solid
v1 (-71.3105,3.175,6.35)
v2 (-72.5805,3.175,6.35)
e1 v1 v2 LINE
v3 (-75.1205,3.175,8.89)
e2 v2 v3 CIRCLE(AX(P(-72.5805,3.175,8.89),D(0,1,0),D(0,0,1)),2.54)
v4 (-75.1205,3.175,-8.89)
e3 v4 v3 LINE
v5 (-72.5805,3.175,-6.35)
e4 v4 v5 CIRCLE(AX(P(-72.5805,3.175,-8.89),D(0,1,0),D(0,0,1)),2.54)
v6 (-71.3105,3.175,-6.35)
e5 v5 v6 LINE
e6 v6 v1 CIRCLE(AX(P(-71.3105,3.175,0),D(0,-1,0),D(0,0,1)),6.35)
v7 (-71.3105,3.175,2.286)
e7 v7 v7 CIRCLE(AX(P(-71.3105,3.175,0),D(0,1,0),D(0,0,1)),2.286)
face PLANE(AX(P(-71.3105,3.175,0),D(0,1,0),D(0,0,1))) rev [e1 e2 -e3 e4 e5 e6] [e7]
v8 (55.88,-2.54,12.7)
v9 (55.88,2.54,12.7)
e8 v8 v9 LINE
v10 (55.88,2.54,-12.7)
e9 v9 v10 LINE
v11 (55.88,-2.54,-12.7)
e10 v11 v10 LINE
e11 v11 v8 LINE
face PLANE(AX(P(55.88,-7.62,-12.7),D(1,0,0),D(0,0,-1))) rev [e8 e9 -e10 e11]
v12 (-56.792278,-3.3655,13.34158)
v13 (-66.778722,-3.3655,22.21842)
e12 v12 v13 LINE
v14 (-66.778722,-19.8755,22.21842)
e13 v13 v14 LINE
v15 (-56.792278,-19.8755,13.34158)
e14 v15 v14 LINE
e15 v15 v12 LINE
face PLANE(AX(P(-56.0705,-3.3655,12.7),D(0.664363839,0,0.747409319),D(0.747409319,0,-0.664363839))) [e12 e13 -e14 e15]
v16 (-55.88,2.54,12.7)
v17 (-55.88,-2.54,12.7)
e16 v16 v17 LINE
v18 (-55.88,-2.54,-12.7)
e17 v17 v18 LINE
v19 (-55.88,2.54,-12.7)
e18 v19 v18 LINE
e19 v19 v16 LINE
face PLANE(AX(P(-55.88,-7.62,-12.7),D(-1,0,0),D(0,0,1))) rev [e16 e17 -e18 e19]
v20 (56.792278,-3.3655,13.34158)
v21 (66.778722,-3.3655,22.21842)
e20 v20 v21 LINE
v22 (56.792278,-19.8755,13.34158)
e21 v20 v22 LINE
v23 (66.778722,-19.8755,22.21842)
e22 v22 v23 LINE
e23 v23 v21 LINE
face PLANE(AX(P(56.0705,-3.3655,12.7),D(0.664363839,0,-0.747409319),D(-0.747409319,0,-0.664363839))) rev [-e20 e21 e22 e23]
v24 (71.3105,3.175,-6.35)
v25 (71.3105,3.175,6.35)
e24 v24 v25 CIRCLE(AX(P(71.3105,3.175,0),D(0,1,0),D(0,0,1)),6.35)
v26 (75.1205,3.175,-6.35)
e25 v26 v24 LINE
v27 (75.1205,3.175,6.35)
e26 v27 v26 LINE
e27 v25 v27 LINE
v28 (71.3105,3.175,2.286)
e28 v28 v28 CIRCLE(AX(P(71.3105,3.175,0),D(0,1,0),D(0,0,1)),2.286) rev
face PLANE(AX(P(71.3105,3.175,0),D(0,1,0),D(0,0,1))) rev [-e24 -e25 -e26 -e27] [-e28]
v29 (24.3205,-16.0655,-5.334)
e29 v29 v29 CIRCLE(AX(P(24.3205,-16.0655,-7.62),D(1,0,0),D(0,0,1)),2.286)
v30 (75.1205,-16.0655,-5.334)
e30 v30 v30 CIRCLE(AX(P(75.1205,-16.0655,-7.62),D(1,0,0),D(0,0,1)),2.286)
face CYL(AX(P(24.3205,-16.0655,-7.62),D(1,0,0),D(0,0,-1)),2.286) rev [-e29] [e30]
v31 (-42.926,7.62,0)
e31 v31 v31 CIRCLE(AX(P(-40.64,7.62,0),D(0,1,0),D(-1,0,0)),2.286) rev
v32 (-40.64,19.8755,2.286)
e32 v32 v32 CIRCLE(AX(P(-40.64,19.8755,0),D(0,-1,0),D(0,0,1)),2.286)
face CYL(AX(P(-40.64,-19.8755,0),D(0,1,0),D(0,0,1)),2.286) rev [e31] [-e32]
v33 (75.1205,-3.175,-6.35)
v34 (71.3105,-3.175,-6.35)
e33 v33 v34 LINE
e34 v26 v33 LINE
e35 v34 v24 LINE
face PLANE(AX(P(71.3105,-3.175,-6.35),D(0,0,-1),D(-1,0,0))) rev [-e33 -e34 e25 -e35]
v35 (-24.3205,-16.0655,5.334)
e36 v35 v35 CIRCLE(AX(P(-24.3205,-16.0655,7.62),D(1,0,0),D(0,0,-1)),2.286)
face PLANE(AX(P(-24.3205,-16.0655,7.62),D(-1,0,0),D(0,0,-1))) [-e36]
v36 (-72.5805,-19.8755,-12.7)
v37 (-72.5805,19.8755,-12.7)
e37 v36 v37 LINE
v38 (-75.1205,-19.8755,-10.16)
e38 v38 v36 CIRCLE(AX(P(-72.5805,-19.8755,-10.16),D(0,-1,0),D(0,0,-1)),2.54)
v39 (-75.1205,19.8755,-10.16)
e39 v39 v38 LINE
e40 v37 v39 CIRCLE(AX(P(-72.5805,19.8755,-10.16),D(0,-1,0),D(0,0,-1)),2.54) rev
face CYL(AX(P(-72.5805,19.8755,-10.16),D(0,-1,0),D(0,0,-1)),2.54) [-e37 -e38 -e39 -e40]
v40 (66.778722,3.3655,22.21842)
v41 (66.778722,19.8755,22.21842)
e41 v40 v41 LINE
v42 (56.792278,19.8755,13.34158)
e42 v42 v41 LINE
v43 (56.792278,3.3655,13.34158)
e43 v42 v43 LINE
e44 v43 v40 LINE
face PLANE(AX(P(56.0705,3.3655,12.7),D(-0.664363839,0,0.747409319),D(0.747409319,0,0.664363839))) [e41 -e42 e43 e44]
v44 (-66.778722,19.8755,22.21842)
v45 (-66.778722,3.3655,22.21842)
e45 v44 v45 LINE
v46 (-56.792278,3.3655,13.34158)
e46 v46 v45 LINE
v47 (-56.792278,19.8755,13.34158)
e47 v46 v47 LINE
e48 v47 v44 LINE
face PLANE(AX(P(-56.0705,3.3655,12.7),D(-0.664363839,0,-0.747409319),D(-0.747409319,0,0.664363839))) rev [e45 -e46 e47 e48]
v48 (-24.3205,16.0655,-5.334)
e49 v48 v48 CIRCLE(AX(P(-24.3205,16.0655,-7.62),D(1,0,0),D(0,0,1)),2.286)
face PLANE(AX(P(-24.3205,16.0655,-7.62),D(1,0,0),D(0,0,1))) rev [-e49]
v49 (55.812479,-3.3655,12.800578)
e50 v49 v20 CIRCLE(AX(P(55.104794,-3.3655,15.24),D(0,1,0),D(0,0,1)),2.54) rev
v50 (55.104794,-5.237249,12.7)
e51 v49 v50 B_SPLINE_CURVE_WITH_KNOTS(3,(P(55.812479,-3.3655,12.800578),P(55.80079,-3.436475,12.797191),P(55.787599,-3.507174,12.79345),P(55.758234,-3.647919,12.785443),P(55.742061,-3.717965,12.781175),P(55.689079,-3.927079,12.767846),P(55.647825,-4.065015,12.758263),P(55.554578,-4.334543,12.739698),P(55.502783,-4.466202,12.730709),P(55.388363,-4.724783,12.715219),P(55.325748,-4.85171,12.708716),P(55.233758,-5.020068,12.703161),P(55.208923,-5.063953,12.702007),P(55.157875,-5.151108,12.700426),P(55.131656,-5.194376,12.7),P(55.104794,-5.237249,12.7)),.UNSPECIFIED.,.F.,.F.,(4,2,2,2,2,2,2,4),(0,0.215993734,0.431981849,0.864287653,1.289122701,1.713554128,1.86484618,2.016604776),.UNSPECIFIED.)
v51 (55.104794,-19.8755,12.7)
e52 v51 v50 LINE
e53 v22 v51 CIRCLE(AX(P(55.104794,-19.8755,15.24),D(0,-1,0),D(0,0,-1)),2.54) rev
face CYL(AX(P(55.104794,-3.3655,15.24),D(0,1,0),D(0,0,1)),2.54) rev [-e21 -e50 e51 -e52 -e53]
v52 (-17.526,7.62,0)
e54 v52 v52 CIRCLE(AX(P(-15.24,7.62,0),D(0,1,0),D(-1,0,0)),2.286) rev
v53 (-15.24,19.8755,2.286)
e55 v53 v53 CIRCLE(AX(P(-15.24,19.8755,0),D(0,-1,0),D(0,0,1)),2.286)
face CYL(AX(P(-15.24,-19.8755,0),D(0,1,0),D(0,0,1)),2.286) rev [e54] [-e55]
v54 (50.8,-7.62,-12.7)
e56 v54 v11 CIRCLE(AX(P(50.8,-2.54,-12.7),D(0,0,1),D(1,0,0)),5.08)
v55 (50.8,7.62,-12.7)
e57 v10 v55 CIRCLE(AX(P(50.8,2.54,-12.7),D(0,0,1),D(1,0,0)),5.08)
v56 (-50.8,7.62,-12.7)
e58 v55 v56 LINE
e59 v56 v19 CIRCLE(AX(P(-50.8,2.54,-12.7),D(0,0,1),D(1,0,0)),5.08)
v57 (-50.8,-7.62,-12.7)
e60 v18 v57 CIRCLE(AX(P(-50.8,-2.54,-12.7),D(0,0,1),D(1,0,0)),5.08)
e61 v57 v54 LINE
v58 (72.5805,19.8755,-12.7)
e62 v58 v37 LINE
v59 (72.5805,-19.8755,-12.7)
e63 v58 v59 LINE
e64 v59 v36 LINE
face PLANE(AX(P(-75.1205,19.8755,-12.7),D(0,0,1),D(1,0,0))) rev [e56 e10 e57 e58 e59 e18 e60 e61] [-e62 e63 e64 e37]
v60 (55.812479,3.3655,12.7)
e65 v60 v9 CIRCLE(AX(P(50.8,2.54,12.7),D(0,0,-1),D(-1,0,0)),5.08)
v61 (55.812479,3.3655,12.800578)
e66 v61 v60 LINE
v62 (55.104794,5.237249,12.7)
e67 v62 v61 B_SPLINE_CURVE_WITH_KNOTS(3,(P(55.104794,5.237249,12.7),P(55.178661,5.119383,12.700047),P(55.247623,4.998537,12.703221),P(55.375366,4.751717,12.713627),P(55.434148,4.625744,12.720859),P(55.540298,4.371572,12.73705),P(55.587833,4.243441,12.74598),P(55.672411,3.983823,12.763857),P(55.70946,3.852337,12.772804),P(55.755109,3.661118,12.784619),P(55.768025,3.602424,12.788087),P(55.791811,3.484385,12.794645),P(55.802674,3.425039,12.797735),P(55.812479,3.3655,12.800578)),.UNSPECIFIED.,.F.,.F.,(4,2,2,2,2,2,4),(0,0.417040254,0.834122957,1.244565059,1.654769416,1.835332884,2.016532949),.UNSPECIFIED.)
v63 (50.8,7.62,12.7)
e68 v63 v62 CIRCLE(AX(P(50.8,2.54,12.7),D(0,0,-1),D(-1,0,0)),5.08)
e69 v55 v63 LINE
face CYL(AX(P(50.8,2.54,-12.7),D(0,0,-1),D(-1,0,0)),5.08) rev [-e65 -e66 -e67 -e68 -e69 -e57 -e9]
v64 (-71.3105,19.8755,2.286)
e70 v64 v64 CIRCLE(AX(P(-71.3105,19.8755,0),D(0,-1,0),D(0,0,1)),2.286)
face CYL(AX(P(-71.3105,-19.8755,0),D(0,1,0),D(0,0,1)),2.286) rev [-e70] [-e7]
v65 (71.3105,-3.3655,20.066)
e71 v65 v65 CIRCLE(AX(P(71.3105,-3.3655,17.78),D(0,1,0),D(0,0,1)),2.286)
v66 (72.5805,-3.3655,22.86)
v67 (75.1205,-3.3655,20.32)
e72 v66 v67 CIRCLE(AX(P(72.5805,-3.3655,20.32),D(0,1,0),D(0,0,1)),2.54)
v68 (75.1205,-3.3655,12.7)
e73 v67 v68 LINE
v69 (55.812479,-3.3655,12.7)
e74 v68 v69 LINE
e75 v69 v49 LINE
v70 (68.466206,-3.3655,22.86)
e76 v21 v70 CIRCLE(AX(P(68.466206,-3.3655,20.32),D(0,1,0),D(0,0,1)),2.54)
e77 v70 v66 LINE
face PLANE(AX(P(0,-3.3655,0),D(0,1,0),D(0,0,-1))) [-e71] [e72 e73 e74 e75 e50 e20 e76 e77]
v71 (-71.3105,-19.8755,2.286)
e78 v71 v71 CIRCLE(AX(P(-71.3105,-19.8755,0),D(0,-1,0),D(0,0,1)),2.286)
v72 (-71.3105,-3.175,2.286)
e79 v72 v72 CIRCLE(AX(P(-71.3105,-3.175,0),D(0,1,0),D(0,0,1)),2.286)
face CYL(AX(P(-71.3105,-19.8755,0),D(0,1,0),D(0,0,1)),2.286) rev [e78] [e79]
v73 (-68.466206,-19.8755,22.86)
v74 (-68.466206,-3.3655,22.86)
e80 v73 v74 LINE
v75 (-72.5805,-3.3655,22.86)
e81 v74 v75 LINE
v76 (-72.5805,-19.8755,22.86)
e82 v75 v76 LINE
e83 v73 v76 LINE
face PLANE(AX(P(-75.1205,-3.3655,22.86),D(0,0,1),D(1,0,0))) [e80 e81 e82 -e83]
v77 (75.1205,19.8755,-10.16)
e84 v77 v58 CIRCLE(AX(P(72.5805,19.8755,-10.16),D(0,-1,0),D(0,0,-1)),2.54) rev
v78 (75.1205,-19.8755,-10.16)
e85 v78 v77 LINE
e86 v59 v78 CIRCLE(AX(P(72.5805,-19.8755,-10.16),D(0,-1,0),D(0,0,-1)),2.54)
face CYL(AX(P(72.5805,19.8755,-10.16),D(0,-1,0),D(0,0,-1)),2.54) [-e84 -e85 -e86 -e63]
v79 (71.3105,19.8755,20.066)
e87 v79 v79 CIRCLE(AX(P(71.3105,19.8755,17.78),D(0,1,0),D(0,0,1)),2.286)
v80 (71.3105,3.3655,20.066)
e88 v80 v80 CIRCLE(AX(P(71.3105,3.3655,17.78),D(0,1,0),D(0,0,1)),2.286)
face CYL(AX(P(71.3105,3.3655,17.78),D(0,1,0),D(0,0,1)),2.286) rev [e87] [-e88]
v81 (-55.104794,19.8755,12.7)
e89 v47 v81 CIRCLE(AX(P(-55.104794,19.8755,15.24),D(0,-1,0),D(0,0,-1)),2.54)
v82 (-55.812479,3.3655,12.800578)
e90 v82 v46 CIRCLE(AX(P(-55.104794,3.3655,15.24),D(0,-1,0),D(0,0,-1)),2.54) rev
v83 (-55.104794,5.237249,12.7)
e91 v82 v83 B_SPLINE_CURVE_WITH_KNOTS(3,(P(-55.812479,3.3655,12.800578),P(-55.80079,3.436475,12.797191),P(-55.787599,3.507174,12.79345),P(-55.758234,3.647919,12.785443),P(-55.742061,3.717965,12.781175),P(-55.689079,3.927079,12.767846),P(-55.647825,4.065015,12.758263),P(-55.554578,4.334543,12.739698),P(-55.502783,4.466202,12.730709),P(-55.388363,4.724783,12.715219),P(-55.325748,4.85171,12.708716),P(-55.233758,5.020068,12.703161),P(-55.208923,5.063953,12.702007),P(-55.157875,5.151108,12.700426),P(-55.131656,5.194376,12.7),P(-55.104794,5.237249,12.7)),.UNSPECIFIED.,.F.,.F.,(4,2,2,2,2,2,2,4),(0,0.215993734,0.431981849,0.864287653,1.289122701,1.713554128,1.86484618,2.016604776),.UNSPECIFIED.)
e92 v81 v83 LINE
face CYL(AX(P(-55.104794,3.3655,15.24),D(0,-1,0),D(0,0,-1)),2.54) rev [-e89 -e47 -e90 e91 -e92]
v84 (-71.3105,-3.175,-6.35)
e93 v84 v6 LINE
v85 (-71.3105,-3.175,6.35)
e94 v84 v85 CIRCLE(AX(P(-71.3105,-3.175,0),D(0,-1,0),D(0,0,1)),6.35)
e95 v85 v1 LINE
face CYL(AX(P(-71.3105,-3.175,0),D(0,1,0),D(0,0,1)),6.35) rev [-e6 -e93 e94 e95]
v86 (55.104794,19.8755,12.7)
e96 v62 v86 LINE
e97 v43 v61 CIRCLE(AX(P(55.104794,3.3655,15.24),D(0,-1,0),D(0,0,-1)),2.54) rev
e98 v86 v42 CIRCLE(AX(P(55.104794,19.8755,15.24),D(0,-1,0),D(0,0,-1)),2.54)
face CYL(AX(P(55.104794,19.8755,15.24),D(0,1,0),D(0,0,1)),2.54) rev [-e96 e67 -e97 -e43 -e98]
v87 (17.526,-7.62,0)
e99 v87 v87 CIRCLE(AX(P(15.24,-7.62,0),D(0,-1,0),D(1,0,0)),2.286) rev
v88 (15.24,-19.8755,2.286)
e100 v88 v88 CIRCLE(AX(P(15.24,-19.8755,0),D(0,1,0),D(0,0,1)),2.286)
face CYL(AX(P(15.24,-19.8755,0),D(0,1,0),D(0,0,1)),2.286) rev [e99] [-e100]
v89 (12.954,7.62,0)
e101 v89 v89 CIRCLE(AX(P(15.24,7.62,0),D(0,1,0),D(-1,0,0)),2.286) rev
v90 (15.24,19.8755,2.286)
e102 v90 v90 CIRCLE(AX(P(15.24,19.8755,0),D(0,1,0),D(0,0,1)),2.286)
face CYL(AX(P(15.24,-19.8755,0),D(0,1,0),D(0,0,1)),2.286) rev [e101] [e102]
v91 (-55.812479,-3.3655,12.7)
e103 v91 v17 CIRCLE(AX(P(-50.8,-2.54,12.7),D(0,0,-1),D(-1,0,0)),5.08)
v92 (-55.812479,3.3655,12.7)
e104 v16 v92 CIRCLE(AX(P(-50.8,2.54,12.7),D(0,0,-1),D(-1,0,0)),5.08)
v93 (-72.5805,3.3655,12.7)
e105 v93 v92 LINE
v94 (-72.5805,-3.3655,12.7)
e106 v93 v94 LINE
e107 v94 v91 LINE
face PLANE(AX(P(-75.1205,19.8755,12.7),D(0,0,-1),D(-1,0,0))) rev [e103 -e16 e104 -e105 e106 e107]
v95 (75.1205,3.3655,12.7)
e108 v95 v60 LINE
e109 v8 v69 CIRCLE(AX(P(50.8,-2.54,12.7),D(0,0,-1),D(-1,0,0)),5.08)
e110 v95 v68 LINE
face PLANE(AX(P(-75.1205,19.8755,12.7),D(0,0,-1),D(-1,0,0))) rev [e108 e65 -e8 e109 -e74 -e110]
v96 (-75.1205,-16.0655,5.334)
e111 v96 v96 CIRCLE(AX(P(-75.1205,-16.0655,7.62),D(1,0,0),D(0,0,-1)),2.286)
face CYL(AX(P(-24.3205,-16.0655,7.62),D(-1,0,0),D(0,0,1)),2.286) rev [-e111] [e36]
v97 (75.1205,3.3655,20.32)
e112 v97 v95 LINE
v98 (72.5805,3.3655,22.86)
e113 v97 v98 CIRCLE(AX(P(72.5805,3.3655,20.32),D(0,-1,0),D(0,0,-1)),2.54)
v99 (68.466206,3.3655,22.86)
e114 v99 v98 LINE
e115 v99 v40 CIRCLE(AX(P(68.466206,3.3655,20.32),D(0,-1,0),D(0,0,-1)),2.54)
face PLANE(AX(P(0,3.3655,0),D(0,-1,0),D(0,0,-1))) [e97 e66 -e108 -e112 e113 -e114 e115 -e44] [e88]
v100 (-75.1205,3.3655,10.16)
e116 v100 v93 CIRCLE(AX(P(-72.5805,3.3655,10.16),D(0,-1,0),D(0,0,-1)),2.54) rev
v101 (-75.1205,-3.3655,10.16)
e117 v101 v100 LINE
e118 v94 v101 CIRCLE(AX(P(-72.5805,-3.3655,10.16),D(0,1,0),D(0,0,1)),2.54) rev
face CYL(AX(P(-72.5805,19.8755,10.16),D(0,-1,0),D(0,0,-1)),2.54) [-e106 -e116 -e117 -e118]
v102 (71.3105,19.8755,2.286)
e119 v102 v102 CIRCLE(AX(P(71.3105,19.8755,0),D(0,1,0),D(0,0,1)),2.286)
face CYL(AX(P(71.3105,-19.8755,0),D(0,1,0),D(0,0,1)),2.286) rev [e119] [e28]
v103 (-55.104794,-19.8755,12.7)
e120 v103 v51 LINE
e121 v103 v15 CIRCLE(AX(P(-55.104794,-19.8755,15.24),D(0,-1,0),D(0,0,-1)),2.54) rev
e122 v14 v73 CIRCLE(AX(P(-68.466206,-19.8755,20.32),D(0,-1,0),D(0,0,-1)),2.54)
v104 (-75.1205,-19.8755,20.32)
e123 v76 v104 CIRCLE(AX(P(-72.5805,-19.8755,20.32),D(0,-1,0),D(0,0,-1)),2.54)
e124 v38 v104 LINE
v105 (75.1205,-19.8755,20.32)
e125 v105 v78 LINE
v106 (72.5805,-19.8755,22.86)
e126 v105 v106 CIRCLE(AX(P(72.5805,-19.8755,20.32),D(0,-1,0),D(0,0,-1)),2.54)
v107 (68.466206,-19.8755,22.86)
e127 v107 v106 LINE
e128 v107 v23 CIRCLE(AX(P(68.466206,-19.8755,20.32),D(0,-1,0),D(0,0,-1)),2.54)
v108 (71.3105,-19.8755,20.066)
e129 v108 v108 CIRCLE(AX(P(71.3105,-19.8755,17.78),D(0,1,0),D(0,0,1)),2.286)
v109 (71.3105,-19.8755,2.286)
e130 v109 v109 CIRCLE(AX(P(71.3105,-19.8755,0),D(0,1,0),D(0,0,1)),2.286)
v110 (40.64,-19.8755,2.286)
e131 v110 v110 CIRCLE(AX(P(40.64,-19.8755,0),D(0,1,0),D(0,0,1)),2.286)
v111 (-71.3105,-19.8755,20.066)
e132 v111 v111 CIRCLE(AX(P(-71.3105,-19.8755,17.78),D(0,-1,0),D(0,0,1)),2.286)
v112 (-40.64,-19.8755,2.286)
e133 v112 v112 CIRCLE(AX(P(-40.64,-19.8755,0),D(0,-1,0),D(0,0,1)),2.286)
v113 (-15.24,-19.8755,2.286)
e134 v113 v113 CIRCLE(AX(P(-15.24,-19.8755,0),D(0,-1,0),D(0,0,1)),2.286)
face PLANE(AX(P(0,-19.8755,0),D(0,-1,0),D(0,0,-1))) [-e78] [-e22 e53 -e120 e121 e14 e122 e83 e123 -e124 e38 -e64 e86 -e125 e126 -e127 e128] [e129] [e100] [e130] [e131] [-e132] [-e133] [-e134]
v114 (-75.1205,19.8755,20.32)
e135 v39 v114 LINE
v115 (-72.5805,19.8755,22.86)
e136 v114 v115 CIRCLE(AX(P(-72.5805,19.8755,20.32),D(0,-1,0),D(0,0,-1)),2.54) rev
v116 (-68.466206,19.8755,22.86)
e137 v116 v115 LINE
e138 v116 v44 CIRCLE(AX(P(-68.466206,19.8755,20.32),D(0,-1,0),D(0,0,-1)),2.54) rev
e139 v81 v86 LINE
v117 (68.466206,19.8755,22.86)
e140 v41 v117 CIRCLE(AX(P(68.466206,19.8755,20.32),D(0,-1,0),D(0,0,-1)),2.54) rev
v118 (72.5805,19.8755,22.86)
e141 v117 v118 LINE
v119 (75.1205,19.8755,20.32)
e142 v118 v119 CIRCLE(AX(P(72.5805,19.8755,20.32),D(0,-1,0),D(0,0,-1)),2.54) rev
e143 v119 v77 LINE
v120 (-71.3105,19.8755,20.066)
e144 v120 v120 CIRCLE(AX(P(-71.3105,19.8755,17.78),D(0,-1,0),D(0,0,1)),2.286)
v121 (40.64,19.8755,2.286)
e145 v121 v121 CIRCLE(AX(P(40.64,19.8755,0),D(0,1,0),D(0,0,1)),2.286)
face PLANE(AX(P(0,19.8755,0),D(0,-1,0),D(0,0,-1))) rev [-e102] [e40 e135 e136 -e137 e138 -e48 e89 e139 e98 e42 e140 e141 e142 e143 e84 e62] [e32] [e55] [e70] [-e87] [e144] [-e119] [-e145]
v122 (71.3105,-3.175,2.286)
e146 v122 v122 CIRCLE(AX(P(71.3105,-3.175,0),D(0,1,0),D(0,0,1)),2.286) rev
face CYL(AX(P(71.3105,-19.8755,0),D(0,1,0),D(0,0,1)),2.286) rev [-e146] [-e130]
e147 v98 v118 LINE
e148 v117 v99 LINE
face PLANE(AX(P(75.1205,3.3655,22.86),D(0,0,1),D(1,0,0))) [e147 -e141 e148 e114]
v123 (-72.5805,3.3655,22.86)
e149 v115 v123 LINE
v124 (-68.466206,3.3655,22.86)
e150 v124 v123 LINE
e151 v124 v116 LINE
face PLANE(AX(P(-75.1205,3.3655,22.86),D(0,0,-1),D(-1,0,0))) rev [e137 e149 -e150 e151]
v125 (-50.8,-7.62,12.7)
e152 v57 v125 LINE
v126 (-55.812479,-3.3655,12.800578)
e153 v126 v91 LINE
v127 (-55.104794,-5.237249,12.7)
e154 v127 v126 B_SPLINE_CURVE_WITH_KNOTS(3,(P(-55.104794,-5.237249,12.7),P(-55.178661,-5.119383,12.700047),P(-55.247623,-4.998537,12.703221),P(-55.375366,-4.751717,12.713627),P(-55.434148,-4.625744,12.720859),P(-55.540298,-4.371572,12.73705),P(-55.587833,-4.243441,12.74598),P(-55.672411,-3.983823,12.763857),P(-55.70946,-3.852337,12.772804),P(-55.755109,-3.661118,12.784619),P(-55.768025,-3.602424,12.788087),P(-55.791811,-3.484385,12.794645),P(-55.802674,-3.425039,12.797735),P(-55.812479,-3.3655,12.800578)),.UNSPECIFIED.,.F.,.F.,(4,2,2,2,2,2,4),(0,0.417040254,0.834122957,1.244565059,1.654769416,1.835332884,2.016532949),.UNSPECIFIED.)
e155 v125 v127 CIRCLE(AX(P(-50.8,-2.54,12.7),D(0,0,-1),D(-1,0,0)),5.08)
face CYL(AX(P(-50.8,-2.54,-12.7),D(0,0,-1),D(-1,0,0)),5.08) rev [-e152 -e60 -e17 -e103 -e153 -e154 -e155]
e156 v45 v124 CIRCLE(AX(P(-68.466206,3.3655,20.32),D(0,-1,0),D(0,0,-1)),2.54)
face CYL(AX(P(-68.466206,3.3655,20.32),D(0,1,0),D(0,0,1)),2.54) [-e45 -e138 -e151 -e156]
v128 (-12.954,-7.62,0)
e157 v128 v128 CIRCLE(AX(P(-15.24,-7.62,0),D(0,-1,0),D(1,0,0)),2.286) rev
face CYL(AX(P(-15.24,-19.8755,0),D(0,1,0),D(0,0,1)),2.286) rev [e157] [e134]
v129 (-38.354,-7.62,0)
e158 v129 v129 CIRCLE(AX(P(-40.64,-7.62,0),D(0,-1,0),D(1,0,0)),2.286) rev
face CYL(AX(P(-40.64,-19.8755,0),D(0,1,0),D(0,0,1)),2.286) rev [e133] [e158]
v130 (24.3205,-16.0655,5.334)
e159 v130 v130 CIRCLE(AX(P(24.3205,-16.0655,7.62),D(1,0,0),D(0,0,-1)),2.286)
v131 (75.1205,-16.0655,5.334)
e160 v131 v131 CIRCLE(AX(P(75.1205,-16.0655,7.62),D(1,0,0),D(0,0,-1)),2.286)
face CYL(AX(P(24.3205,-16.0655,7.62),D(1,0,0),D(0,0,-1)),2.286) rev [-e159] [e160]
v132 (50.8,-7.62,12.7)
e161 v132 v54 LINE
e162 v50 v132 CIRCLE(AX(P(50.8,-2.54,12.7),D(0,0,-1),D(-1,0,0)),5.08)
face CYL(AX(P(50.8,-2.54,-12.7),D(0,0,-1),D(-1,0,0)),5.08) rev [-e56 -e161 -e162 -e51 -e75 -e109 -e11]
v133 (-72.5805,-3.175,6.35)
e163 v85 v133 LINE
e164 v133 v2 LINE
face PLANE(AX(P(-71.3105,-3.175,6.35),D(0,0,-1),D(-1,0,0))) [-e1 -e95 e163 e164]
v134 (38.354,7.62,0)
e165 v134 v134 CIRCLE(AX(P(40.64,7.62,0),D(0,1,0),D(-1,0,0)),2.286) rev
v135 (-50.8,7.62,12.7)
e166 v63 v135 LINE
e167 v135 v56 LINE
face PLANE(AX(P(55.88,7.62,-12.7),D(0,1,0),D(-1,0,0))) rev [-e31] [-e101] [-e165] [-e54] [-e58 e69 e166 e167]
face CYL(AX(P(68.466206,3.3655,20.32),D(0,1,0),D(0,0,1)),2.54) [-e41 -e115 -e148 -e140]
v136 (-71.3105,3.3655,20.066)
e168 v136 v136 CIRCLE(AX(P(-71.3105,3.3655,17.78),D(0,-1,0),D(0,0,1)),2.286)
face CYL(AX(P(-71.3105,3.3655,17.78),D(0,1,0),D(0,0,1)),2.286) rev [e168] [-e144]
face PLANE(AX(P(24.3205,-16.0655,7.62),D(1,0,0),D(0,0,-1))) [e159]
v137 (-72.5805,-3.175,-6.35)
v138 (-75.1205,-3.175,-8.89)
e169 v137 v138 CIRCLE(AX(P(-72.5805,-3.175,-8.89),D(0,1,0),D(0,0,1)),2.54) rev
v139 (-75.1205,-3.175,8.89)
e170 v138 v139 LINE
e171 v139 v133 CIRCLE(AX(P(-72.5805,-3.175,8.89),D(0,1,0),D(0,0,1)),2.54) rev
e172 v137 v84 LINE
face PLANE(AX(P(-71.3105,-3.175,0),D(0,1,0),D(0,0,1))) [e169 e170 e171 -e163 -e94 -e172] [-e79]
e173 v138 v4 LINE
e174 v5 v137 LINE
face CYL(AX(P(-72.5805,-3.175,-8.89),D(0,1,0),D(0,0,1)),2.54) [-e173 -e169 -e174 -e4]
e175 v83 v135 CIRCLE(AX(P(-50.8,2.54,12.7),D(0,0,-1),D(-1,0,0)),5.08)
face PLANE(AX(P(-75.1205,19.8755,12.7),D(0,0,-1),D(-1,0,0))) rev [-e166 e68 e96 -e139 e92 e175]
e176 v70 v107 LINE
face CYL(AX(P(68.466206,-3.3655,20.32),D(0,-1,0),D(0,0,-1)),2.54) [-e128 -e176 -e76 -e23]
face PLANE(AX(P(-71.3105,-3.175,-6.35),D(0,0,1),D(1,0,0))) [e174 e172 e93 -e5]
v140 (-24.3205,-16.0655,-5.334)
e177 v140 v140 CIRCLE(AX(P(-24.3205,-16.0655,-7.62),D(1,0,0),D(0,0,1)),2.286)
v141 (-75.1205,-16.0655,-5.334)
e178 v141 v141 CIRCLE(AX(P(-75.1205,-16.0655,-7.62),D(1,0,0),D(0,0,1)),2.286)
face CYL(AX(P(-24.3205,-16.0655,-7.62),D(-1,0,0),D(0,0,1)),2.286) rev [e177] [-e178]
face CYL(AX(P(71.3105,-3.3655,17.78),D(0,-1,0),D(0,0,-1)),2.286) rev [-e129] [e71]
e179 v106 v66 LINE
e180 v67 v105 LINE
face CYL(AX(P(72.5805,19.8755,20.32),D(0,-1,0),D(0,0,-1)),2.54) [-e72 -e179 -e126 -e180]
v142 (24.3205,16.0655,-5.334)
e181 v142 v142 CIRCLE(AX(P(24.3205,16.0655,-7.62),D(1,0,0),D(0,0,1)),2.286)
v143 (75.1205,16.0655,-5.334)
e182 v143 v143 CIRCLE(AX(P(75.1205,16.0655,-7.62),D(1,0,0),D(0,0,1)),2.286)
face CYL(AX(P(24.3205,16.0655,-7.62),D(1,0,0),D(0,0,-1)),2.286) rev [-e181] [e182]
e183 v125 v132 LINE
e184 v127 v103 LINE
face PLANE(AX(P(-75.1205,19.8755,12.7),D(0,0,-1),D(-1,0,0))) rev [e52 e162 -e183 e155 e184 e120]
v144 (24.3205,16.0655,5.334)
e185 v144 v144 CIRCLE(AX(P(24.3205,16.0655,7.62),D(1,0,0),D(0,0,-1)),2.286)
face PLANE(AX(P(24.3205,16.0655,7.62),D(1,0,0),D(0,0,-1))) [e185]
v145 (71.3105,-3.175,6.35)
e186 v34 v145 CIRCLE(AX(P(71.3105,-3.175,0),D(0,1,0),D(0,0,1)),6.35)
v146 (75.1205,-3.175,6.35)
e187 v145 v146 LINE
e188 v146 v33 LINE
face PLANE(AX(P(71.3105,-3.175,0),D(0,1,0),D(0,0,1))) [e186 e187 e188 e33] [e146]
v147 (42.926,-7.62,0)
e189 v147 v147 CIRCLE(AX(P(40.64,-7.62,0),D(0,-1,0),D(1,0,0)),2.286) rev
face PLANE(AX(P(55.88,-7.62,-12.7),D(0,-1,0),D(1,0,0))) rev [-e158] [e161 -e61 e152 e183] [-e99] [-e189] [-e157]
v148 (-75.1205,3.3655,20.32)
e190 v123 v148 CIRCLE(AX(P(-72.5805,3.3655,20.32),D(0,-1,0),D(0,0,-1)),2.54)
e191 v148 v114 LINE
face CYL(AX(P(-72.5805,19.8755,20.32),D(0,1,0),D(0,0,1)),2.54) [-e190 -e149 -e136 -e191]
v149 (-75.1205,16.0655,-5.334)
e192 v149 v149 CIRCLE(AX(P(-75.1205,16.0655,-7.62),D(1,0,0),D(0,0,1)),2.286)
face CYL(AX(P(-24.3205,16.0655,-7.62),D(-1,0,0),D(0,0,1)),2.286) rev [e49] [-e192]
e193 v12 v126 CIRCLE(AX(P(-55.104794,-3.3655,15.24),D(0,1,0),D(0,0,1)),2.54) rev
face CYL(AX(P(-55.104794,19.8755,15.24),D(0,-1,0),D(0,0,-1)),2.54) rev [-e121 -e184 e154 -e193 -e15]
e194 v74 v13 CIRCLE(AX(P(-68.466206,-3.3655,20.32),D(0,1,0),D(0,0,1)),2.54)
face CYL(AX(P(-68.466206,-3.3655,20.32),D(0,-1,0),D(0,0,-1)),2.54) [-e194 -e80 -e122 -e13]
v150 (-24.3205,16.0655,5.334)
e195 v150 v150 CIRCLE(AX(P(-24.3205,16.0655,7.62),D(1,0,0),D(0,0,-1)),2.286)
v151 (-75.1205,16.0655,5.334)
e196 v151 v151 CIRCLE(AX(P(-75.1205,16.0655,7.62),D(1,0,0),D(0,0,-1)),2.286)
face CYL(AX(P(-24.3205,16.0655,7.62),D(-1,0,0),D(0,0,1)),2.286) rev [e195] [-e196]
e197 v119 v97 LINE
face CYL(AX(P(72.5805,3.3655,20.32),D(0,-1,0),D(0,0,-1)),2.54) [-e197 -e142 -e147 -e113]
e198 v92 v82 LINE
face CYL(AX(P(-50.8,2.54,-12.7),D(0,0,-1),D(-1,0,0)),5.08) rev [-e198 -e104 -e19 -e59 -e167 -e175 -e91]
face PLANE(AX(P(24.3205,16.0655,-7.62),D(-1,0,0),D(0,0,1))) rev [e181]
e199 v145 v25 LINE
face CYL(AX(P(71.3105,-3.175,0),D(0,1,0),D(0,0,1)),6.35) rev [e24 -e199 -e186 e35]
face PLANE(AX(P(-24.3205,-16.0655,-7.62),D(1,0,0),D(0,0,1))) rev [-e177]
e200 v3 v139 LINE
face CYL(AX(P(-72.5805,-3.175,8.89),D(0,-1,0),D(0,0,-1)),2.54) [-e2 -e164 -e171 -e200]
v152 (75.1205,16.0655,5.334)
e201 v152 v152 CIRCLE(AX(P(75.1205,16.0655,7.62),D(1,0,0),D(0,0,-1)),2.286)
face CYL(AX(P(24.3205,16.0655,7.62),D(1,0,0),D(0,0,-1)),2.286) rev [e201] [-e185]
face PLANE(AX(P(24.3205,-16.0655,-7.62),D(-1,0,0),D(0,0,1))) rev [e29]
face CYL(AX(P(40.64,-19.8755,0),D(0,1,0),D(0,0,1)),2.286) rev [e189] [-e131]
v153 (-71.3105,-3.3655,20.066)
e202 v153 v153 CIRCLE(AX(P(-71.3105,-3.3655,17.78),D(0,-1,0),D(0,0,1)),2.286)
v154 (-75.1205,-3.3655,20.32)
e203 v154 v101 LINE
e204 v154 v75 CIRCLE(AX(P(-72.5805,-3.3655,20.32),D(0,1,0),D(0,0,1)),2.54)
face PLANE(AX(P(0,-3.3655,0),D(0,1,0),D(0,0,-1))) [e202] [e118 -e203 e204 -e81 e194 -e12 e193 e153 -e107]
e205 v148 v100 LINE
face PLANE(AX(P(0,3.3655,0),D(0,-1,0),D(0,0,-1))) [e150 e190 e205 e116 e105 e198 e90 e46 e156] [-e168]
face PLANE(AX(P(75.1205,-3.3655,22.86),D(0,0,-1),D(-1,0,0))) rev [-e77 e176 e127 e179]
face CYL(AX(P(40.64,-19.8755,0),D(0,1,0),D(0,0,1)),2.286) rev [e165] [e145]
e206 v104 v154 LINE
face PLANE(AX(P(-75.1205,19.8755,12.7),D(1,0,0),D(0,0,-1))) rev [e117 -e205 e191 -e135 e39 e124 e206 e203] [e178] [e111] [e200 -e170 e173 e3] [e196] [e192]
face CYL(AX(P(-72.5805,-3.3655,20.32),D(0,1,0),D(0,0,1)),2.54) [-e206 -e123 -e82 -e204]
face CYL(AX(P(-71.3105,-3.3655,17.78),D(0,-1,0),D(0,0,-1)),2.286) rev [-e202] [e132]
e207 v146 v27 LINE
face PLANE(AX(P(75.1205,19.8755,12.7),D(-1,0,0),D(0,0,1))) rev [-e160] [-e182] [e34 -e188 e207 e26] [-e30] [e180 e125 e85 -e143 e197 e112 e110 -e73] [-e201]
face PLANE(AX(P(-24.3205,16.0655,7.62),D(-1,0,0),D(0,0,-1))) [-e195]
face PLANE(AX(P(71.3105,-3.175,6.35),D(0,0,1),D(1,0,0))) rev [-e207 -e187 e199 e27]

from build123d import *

# Parameters (mm, degrees)
SKETCH2_W               = 150.241
SKETCH2_H               = 25.4
BOSS_EXTRUDE1_DEPTH     = 19.8755
SKETCH3_R               = 2.286
CUT_EXTRUDE1_DEPTH      = 50.8
SKETCH4_R               = 2.286
BOSS_EXTRUDE2_DEPTH     = 16.51
SKETCH5_R               = 2.286
CUT_EXTRUDE2_DEPTH      = 89.01028986
CUT_EXTRUDE3_DEPTH      = 3.175
SKETCH9_R               = 2.286
CUT_EXTRUDE5_DEPTH      = 89.01028986
SKETCH7_W               = 111.76
SKETCH7_H               = 15.24
CUT_EXTRUDE4_DEPTH      = 82.75136097
MIRROR1_COPY_1_SKETCH_R = 2.286
MIRROR1_COPY_1_DEPTH    = 16.51
FILLET1_R               = 2.54
FILLET2_R               = 5.08


with BuildPart() as part:
    # Sketch2 → Boss-Extrude1 (new, symmetric)
    with BuildSketch(Plane(origin=(0, 0, 0), x_dir=(1, 0, 0), z_dir=(0, 1, 0))):
        Rectangle(SKETCH2_W, SKETCH2_H)
    extrude(amount=BOSS_EXTRUDE1_DEPTH, both=True)

    # Sketch3 → Cut-Extrude1 (cut)
    with BuildSketch(Plane(origin=(75.1205, 0, 0), x_dir=(0, 0, -1), z_dir=(1, 0, 0))):
        with Locations((-7.62, 16.0655)):
            Circle(SKETCH3_R)
        with Locations((-7.62, -16.0655)):
            Circle(SKETCH3_R)
        with Locations(Location((7.62, 16.0655, 0), (0, 0, 180))):
            Circle(SKETCH3_R)
        with Locations(Location((7.62, -16.0655, 0), (0, 0, 180))):
            Circle(SKETCH3_R)
    cut_extrude1 = extrude(amount=-CUT_EXTRUDE1_DEPTH, mode=Mode.SUBTRACT)

    # Sketch4 → Boss-Extrude2 (add)
    with BuildSketch(Plane(origin=(0, 19.8755, 0), x_dir=(1, 0, 0), z_dir=(0, 1, 0))):
        Polygon((75.1205, -12.7), (56.0705, -12.7), (67.5005, -22.86), (75.1205, -22.86), align=None)
        with Locations(Location((71.3105, -17.78, 0), (0, 0, 270))):
            Circle(SKETCH4_R, mode=Mode.SUBTRACT)
    boss_extrude2 = extrude(amount=-BOSS_EXTRUDE2_DEPTH)

    # Sketch5 → Cut-Extrude2 (cut, through all)
    with BuildSketch(Plane(origin=(0, 19.8755, 0), x_dir=(1, 0, 0), z_dir=(0, 1, 0))):
        with Locations(Location((71.3105, 0, 0), (0, 0, 270))):
            Circle(SKETCH5_R)
    cut_extrude2 = extrude(amount=-CUT_EXTRUDE2_DEPTH, mode=Mode.SUBTRACT)

    # Sketch6 → Cut-Extrude3 (cut, symmetric)
    with BuildSketch(Plane(origin=(0, 0, 0), x_dir=(1, 0, 0), z_dir=(0, 1, 0))):
        with BuildLine():
            Line((71.3105, 6.35), (77.6605, 6.35))
            Line((77.6605, 6.35), (77.6605, -6.35))
            Line((77.6605, -6.35), (71.3105, -6.35))
            ThreePointArc((71.3105, -6.35), (64.9605, 0), (71.3105, 6.35))
        make_face()
    cut_extrude3 = extrude(amount=CUT_EXTRUDE3_DEPTH, both=True, mode=Mode.SUBTRACT)

    # Sketch9 → Cut-Extrude5 (cut, through all)
    with BuildSketch(Plane(origin=(0, 19.8755, 0), x_dir=(1, 0, 0), z_dir=(0, 1, 0))):
        with Locations(Location((15.24, 0, 0), (0, 0, 270))):
            Circle(SKETCH9_R)
        with Locations(Location((40.64, 0, 0), (0, 0, 270))):
            Circle(SKETCH9_R)
    cut_extrude5 = extrude(amount=-CUT_EXTRUDE5_DEPTH, mode=Mode.SUBTRACT)

    # Sketch7 → Cut-Extrude4 (cut, through all)
    with BuildSketch(Plane.XY.offset(12.7)):
        Rectangle(SKETCH7_W, SKETCH7_H)
    extrude(amount=-CUT_EXTRUDE4_DEPTH, mode=Mode.SUBTRACT)

    # Mirror2: Boss-Extrude2 across plane
    add(boss_extrude2.mirror(Plane.ZX))

    # Mirror1: Cut-Extrude1, Boss-Extrude2, Cut-Extrude2, Cut-Extrude3, Cut-Extrude5 across plane
    add(cut_extrude1.mirror(Plane(origin=(0, 0, 0), x_dir=(0, 0, 1), z_dir=(1, 0, 0))), mode=Mode.SUBTRACT)
    add(boss_extrude2.mirror(Plane(origin=(0, 0, 0), x_dir=(0, 0, 1), z_dir=(1, 0, 0))))
    add(cut_extrude2.mirror(Plane(origin=(0, 0, 0), x_dir=(0, 0, 1), z_dir=(1, 0, 0))), mode=Mode.SUBTRACT)
    add(cut_extrude3.mirror(Plane(origin=(0, 0, 0), x_dir=(0, 0, 1), z_dir=(1, 0, 0))), mode=Mode.SUBTRACT)
    add(cut_extrude5.mirror(Plane(origin=(0, 0, 0), x_dir=(0, 0, 1), z_dir=(1, 0, 0))), mode=Mode.SUBTRACT)

    # Mirror1 copy 1 sketch → Mirror1 copy 1 (add)
    with BuildSketch(Plane(origin=(0, -19.8755, 0), x_dir=(-1, 0, 0), z_dir=(0, -1, 0))):
        Polygon((75.1205, -12.7), (56.0705, -12.7), (67.5005, -22.86), (75.1205, -22.86), align=None)
        with Locations(Location((71.3105, -17.78, 0), (0, 0, 270))):
            Circle(MIRROR1_COPY_1_SKETCH_R, mode=Mode.SUBTRACT)
    extrude(amount=-MIRROR1_COPY_1_DEPTH)

    # Fillet1
    # the kernel refuses this fillet: 2.54 mm, written as the material it adds along each edge
    with BuildSketch(Plane(origin=(56.0705, -19.8755, 12.7), x_dir=(-1, 0, 0), z_dir=(0, 1, 0))) as fillet1_piece_1_section:
        with BuildLine():
            CenterArc((FILLET1_R * 0.380199322349, FILLET1_R), FILLET1_R, 228.366460663, 41.633539337)
            Line((-FILLET1_R * 0.284164516481, FILLET1_R * 0.252590681316), (0, 0))
            Line((0, 0), (FILLET1_R * 0.380199322349, 0))
        make_face()
    fillet1_piece_1 = extrude(amount=16.51, mode=Mode.PRIVATE)
    fillet1_piece_1 = split(fillet1_piece_1, bisect_by=Plane(origin=(55.88, -13.74775, 12.701738507), z_dir=(-1, 0, 0)), keep=Keep.TOP, mode=Mode.PRIVATE)
    fillet1_piece_1 = split(fillet1_piece_1, bisect_by=Plane(origin=(55.578187308, -7.62, 12.701738507), z_dir=(0, -1, 0)), keep=Keep.TOP, mode=Mode.PRIVATE)
    add(fillet1_piece_1)
    with BuildSketch(Plane(origin=(56.0705, -19.8755, 12.7), x_dir=(-1, 0, 0), z_dir=(0, 1, 0))) as fillet1_piece_2_section:
        with BuildLine():
            CenterArc((FILLET1_R * 0.380199322349, FILLET1_R), FILLET1_R, 228.366460663, 41.633539337)
            Line((-FILLET1_R * 0.284164516481, FILLET1_R * 0.252590681316), (0, 0))
            Line((0, 0), (FILLET1_R * 0.380199322349, 0))
        make_face()
    fillet1_piece_2 = extrude(amount=16.51, mode=Mode.PRIVATE)
    fillet1_piece_2 = split(fillet1_piece_2, bisect_by=Plane(origin=(55.88, -13.74775, 12.901323777), z_dir=(1, 0, 0)), keep=Keep.TOP, mode=Mode.PRIVATE)
    fillet1_piece_2 = split(fillet1_piece_2, bisect_by=Plane(origin=(56.245469939, -7.62, 12.901323777), z_dir=(0, -1, 0)), keep=Keep.TOP, mode=Mode.PRIVATE)
    add(fillet1_piece_2)
    with BuildSketch(Plane(origin=(56.0705, -19.8755, 12.7), x_dir=(-1, 0, 0), z_dir=(0, 1, 0))) as fillet1_piece_3_section:
        with BuildLine():
            CenterArc((FILLET1_R * 0.380199322349, FILLET1_R), FILLET1_R, 228.366460663, 41.633539337)
            Line((-FILLET1_R * 0.284164516481, FILLET1_R * 0.252590681316), (0, 0))
            Line((0, 0), (FILLET1_R * 0.380199322349, 0))
        make_face()
    fillet1_piece_3 = extrude(amount=16.51, mode=Mode.PRIVATE)
    fillet1_piece_3 = split(fillet1_piece_3, bisect_by=Plane(origin=(55.88, -5.49275, 12.901323777), z_dir=(1, 0, 0)), keep=Keep.TOP, mode=Mode.PRIVATE)
    fillet1_piece_3 = split(fillet1_piece_3, bisect_by=Plane(origin=(56.245469939, -7.62, 12.901323777), z_dir=(0, 1, 0)), keep=Keep.TOP, mode=Mode.PRIVATE)
    add(fillet1_piece_3)
    with BuildSketch(Plane(origin=(-56.0705, 19.8755, 12.7), x_dir=(1, 0, 0), z_dir=(0, -1, 0))) as fillet1_piece_4_section:
        with BuildLine():
            CenterArc((FILLET1_R * 0.380199322349, FILLET1_R), FILLET1_R, 228.366460663, 41.633539337)
            Line((-FILLET1_R * 0.284164516481, FILLET1_R * 0.252590681316), (0, 0))
            Line((0, 0), (FILLET1_R * 0.380199322349, 0))
        make_face()
    fillet1_piece_4 = extrude(amount=16.51, mode=Mode.PRIVATE)
    fillet1_piece_4 = split(fillet1_piece_4, bisect_by=Plane(origin=(-55.578187308, 7.62, 12.701738507), z_dir=(0, 1, 0)), keep=Keep.TOP, mode=Mode.PRIVATE)
    fillet1_piece_4 = split(fillet1_piece_4, bisect_by=Plane(origin=(-55.88, 13.74775, 12.701738507), z_dir=(1, 0, 0)), keep=Keep.TOP, mode=Mode.PRIVATE)
    add(fillet1_piece_4)
    with BuildSketch(Plane(origin=(-56.0705, 19.8755, 12.7), x_dir=(1, 0, 0), z_dir=(0, -1, 0))) as fillet1_piece_5_section:
        with BuildLine():
            CenterArc((FILLET1_R * 0.380199322349, FILLET1_R), FILLET1_R, 228.366460663, 41.633539337)
            Line((-FILLET1_R * 0.284164516481, FILLET1_R * 0.252590681316), (0, 0))
            Line((0, 0), (FILLET1_R * 0.380199322349, 0))
        make_face()
    fillet1_piece_5 = extrude(amount=16.51, mode=Mode.PRIVATE)
    fillet1_piece_5 = split(fillet1_piece_5, bisect_by=Plane(origin=(-56.245469939, 7.62, 12.901323777), z_dir=(0, 1, 0)), keep=Keep.TOP, mode=Mode.PRIVATE)
    fillet1_piece_5 = split(fillet1_piece_5, bisect_by=Plane(origin=(-55.88, 13.74775, 12.901323777), z_dir=(-1, 0, 0)), keep=Keep.TOP, mode=Mode.PRIVATE)
    add(fillet1_piece_5)
    with BuildSketch(Plane(origin=(-56.0705, 19.8755, 12.7), x_dir=(1, 0, 0), z_dir=(0, -1, 0))) as fillet1_piece_6_section:
        with BuildLine():
            CenterArc((FILLET1_R * 0.380199322349, FILLET1_R), FILLET1_R, 228.366460663, 41.633539337)
            Line((-FILLET1_R * 0.284164516481, FILLET1_R * 0.252590681316), (0, 0))
            Line((0, 0), (FILLET1_R * 0.380199322349, 0))
        make_face()
    fillet1_piece_6 = extrude(amount=16.51, mode=Mode.PRIVATE)
    fillet1_piece_6 = split(fillet1_piece_6, bisect_by=Plane(origin=(-56.245469939, 7.62, 12.901323777), z_dir=(0, -1, 0)), keep=Keep.TOP, mode=Mode.PRIVATE)
    fillet1_piece_6 = split(fillet1_piece_6, bisect_by=Plane(origin=(-55.88, 5.49275, 12.901323777), z_dir=(-1, 0, 0)), keep=Keep.TOP, mode=Mode.PRIVATE)
    add(fillet1_piece_6)
    with BuildSketch(Plane(origin=(-56.0705, -19.8755, 12.7), x_dir=(1, 0, 0), z_dir=(0, 1, 0))) as fillet1_piece_7_section:
        with BuildLine():
            CenterArc((FILLET1_R * 0.380199322349, -FILLET1_R), FILLET1_R, 90, 41.633539337)
            Line((-FILLET1_R * 0.284164516481, -FILLET1_R * 0.252590681316), (0, 0))
            Line((0, 0), (FILLET1_R * 0.380199322349, 0))
        make_face()
    fillet1_piece_7 = extrude(amount=16.51, mode=Mode.PRIVATE)
    fillet1_piece_7 = split(fillet1_piece_7, bisect_by=Plane(origin=(-55.578187308, -7.62, 12.701738507), z_dir=(0, -1, 0)), keep=Keep.TOP, mode=Mode.PRIVATE)
    fillet1_piece_7 = split(fillet1_piece_7, bisect_by=Plane(origin=(-55.88, -13.74775, 12.701738507), z_dir=(1, 0, 0)), keep=Keep.TOP, mode=Mode.PRIVATE)
    add(fillet1_piece_7)
    with BuildSketch(Plane(origin=(-56.0705, -19.8755, 12.7), x_dir=(1, 0, 0), z_dir=(0, 1, 0))) as fillet1_piece_8_section:
        with BuildLine():
            CenterArc((FILLET1_R * 0.380199322349, -FILLET1_R), FILLET1_R, 90, 41.633539337)
            Line((-FILLET1_R * 0.284164516481, -FILLET1_R * 0.252590681316), (0, 0))
            Line((0, 0), (FILLET1_R * 0.380199322349, 0))
        make_face()
    fillet1_piece_8 = extrude(amount=16.51, mode=Mode.PRIVATE)
    fillet1_piece_8 = split(fillet1_piece_8, bisect_by=Plane(origin=(-56.245469939, -7.62, 12.901323777), z_dir=(0, -1, 0)), keep=Keep.TOP, mode=Mode.PRIVATE)
    fillet1_piece_8 = split(fillet1_piece_8, bisect_by=Plane(origin=(-55.88, -13.74775, 12.901323777), z_dir=(-1, 0, 0)), keep=Keep.TOP, mode=Mode.PRIVATE)
    add(fillet1_piece_8)
    with BuildSketch(Plane(origin=(-56.0705, -19.8755, 12.7), x_dir=(1, 0, 0), z_dir=(0, 1, 0))) as fillet1_piece_9_section:
        with BuildLine():
            CenterArc((FILLET1_R * 0.380199322349, -FILLET1_R), FILLET1_R, 90, 41.633539337)
            Line((-FILLET1_R * 0.284164516481, -FILLET1_R * 0.252590681316), (0, 0))
            Line((0, 0), (FILLET1_R * 0.380199322349, 0))
        make_face()
    fillet1_piece_9 = extrude(amount=16.51, mode=Mode.PRIVATE)
    fillet1_piece_9 = split(fillet1_piece_9, bisect_by=Plane(origin=(-56.245469939, -7.62, 12.901323777), z_dir=(0, 1, 0)), keep=Keep.TOP, mode=Mode.PRIVATE)
    fillet1_piece_9 = split(fillet1_piece_9, bisect_by=Plane(origin=(-55.88, -5.49275, 12.901323777), z_dir=(-1, 0, 0)), keep=Keep.TOP, mode=Mode.PRIVATE)
    add(fillet1_piece_9)
    with BuildSketch(Plane(origin=(56.0705, 19.8755, 12.7), x_dir=(-1, 0, 0), z_dir=(0, -1, 0))) as fillet1_piece_10_section:
        with BuildLine():
            CenterArc((FILLET1_R * 0.380199322349, -FILLET1_R), FILLET1_R, 90, 41.633539337)
            Line((-FILLET1_R * 0.284164516481, -FILLET1_R * 0.252590681316), (0, 0))
            Line((0, 0), (FILLET1_R * 0.380199322349, 0))
        make_face()
    fillet1_piece_10 = extrude(amount=16.51, mode=Mode.PRIVATE)
    fillet1_piece_10 = split(fillet1_piece_10, bisect_by=Plane(origin=(55.88, 13.74775, 12.701738507), z_dir=(-1, 0, 0)), keep=Keep.TOP, mode=Mode.PRIVATE)
    fillet1_piece_10 = split(fillet1_piece_10, bisect_by=Plane(origin=(55.578187308, 7.62, 12.701738507), z_dir=(0, 1, 0)), keep=Keep.TOP, mode=Mode.PRIVATE)
    add(fillet1_piece_10)
    with BuildSketch(Plane(origin=(56.0705, 19.8755, 12.7), x_dir=(-1, 0, 0), z_dir=(0, -1, 0))) as fillet1_piece_11_section:
        with BuildLine():
            CenterArc((FILLET1_R * 0.380199322349, -FILLET1_R), FILLET1_R, 90, 41.633539337)
            Line((-FILLET1_R * 0.284164516481, -FILLET1_R * 0.252590681316), (0, 0))
            Line((0, 0), (FILLET1_R * 0.380199322349, 0))
        make_face()
    fillet1_piece_11 = extrude(amount=16.51, mode=Mode.PRIVATE)
    fillet1_piece_11 = split(fillet1_piece_11, bisect_by=Plane(origin=(55.88, 13.74775, 12.901323777), z_dir=(1, 0, 0)), keep=Keep.TOP, mode=Mode.PRIVATE)
    fillet1_piece_11 = split(fillet1_piece_11, bisect_by=Plane(origin=(56.245469939, 7.62, 12.901323777), z_dir=(0, 1, 0)), keep=Keep.TOP, mode=Mode.PRIVATE)
    add(fillet1_piece_11)
    with BuildSketch(Plane(origin=(56.0705, 19.8755, 12.7), x_dir=(-1, 0, 0), z_dir=(0, -1, 0))) as fillet1_piece_12_section:
        with BuildLine():
            CenterArc((FILLET1_R * 0.380199322349, -FILLET1_R), FILLET1_R, 90, 41.633539337)
            Line((-FILLET1_R * 0.284164516481, -FILLET1_R * 0.252590681316), (0, 0))
            Line((0, 0), (FILLET1_R * 0.380199322349, 0))
        make_face()
    fillet1_piece_12 = extrude(amount=16.51, mode=Mode.PRIVATE)
    fillet1_piece_12 = split(fillet1_piece_12, bisect_by=Plane(origin=(55.88, 5.49275, 12.901323777), z_dir=(1, 0, 0)), keep=Keep.TOP, mode=Mode.PRIVATE)
    fillet1_piece_12 = split(fillet1_piece_12, bisect_by=Plane(origin=(56.245469939, 7.62, 12.901323777), z_dir=(0, -1, 0)), keep=Keep.TOP, mode=Mode.PRIVATE)
    add(fillet1_piece_12)
    # the kernel refuses this fillet: 2.54 mm, written as the material it takes off along each edge
    with BuildSketch(Plane(origin=(75.1205, -26.2255, 22.86), x_dir=(-1, 0, 0), z_dir=(0, 1, 0)), Plane(origin=(-75.1205, 26.2255, 22.86), x_dir=(1, 0, 0), z_dir=(0, -1, 0)), Plane(origin=(-75.1205, -26.2255, 22.86), x_dir=(0, 0, -1), z_dir=(0, 1, 0))) as fillet1_2_piece_1:
        with BuildLine():
            CenterArc((FILLET1_R, -FILLET1_R), FILLET1_R, 90, 90)
            Line((0, -FILLET1_R), (0, 0))
            Line((0, 0), (FILLET1_R, 0))
        make_face()
    extrude(amount=29.21, mode=Mode.SUBTRACT)
    with BuildSketch(Plane(origin=(67.5005, -22.289765697, 22.86), x_dir=(1, 0, 0), z_dir=(0, 1, 0)), Plane(origin=(-67.5005, -22.289765697, 22.86), x_dir=(0.7474093186836585, 0, -0.6643638388299211), z_dir=(0, 1, 0))) as fillet1_2_piece_2:
        with BuildLine():
            CenterArc((FILLET1_R * 0.380199322349, FILLET1_R), FILLET1_R, 228.366460663, 41.633539337)
            Line((-FILLET1_R * 0.284164516481, FILLET1_R * 0.252590681316), (0, 0))
            Line((0, 0), (FILLET1_R * 0.380199322349, 0))
        make_face()
    extrude(amount=21.338531394, mode=Mode.SUBTRACT)
    with BuildSketch(Plane(origin=(-75.1205, 3.3655, 12.7), x_dir=(0, 0, -1), z_dir=(0, -1, 0))) as fillet1_2_piece_3:
        with BuildLine():
            CenterArc((FILLET1_R, FILLET1_R), FILLET1_R, 180, 90)
            Line((0, FILLET1_R), (0, 0))
            Line((0, 0), (FILLET1_R, 0))
        make_face()
    extrude(amount=6.731, mode=Mode.SUBTRACT)
    with BuildSketch(Plane(origin=(-67.5005, 22.289765697, 22.86), x_dir=(0.7474093186836585, 0, -0.6643638388299211), z_dir=(0, -1, 0)), Plane(origin=(67.5005, 22.289765697, 22.86), x_dir=(1, 0, 0), z_dir=(0, -1, 0))) as fillet1_2_piece_4:
        with BuildLine():
            CenterArc((FILLET1_R * 0.380199322349, -FILLET1_R), FILLET1_R, 90, 41.633539337)
            Line((-FILLET1_R * 0.284164516481, -FILLET1_R * 0.252590681316), (0, 0))
            Line((0, 0), (FILLET1_R * 0.380199322349, 0))
        make_face()
    extrude(amount=21.338531394, mode=Mode.SUBTRACT)
    with BuildSketch(Plane(origin=(-75.1205, 3.175, -6.35), x_dir=(0, 0, -1), z_dir=(0, -1, 0)), Plane(origin=(-75.1205, -3.175, 6.35), x_dir=(0, 0, 1), z_dir=(0, 1, 0))) as fillet1_2_piece_5:
        with BuildLine():
            CenterArc((FILLET1_R, FILLET1_R), FILLET1_R, 180, 90)
            Line((0, FILLET1_R), (0, 0))
            Line((0, 0), (FILLET1_R, 0))
        make_face()
    extrude(amount=6.35, mode=Mode.SUBTRACT)
    with BuildSketch(Plane(origin=(75.1205, 26.2255, 22.86), x_dir=(-1, 0, 0), z_dir=(0, -1, 0))) as fillet1_2_piece_6:
        with BuildLine():
            CenterArc((FILLET1_R, FILLET1_R), FILLET1_R, 180, 90)
            Line((0, FILLET1_R), (0, 0))
            Line((0, 0), (FILLET1_R, 0))
        make_face()
    extrude(amount=29.21, mode=Mode.SUBTRACT)
    with BuildSketch(Plane(origin=(-75.1205, 26.2255, -12.7), x_dir=(0, 0, 1), z_dir=(0, -1, 0))) as fillet1_2_piece_7:
        with BuildLine():
            CenterArc((FILLET1_R, -FILLET1_R), FILLET1_R, 90, 90)
            Line((0, -FILLET1_R), (0, 0))
            Line((0, 0), (FILLET1_R, 0))
        make_face()
    extrude(amount=52.451, mode=Mode.SUBTRACT)
    with BuildSketch(Plane(origin=(75.1205, -26.2255, -12.7), x_dir=(-1, 0, 0), z_dir=(0, 1, 0))) as fillet1_2_piece_8:
        with BuildLine():
            CenterArc((FILLET1_R, FILLET1_R), FILLET1_R, 180, 90)
            Line((0, FILLET1_R), (0, 0))
            Line((0, 0), (FILLET1_R, 0))
        make_face()
    extrude(amount=52.451, mode=Mode.SUBTRACT)

    # Fillet2
    fillet2_edges = [part.edges().sort_by_distance(p)[0] for p in [
        (55.88, 7.62, 0.060593614),
        (55.88, -7.62, 0.060593614),
        (-55.88, 7.62, 0.060593614),
        (-55.88, -7.62, 0.060593614),
    ]]
    fillet(fillet2_edges, radius=FILLET2_R)


solid = part.part
